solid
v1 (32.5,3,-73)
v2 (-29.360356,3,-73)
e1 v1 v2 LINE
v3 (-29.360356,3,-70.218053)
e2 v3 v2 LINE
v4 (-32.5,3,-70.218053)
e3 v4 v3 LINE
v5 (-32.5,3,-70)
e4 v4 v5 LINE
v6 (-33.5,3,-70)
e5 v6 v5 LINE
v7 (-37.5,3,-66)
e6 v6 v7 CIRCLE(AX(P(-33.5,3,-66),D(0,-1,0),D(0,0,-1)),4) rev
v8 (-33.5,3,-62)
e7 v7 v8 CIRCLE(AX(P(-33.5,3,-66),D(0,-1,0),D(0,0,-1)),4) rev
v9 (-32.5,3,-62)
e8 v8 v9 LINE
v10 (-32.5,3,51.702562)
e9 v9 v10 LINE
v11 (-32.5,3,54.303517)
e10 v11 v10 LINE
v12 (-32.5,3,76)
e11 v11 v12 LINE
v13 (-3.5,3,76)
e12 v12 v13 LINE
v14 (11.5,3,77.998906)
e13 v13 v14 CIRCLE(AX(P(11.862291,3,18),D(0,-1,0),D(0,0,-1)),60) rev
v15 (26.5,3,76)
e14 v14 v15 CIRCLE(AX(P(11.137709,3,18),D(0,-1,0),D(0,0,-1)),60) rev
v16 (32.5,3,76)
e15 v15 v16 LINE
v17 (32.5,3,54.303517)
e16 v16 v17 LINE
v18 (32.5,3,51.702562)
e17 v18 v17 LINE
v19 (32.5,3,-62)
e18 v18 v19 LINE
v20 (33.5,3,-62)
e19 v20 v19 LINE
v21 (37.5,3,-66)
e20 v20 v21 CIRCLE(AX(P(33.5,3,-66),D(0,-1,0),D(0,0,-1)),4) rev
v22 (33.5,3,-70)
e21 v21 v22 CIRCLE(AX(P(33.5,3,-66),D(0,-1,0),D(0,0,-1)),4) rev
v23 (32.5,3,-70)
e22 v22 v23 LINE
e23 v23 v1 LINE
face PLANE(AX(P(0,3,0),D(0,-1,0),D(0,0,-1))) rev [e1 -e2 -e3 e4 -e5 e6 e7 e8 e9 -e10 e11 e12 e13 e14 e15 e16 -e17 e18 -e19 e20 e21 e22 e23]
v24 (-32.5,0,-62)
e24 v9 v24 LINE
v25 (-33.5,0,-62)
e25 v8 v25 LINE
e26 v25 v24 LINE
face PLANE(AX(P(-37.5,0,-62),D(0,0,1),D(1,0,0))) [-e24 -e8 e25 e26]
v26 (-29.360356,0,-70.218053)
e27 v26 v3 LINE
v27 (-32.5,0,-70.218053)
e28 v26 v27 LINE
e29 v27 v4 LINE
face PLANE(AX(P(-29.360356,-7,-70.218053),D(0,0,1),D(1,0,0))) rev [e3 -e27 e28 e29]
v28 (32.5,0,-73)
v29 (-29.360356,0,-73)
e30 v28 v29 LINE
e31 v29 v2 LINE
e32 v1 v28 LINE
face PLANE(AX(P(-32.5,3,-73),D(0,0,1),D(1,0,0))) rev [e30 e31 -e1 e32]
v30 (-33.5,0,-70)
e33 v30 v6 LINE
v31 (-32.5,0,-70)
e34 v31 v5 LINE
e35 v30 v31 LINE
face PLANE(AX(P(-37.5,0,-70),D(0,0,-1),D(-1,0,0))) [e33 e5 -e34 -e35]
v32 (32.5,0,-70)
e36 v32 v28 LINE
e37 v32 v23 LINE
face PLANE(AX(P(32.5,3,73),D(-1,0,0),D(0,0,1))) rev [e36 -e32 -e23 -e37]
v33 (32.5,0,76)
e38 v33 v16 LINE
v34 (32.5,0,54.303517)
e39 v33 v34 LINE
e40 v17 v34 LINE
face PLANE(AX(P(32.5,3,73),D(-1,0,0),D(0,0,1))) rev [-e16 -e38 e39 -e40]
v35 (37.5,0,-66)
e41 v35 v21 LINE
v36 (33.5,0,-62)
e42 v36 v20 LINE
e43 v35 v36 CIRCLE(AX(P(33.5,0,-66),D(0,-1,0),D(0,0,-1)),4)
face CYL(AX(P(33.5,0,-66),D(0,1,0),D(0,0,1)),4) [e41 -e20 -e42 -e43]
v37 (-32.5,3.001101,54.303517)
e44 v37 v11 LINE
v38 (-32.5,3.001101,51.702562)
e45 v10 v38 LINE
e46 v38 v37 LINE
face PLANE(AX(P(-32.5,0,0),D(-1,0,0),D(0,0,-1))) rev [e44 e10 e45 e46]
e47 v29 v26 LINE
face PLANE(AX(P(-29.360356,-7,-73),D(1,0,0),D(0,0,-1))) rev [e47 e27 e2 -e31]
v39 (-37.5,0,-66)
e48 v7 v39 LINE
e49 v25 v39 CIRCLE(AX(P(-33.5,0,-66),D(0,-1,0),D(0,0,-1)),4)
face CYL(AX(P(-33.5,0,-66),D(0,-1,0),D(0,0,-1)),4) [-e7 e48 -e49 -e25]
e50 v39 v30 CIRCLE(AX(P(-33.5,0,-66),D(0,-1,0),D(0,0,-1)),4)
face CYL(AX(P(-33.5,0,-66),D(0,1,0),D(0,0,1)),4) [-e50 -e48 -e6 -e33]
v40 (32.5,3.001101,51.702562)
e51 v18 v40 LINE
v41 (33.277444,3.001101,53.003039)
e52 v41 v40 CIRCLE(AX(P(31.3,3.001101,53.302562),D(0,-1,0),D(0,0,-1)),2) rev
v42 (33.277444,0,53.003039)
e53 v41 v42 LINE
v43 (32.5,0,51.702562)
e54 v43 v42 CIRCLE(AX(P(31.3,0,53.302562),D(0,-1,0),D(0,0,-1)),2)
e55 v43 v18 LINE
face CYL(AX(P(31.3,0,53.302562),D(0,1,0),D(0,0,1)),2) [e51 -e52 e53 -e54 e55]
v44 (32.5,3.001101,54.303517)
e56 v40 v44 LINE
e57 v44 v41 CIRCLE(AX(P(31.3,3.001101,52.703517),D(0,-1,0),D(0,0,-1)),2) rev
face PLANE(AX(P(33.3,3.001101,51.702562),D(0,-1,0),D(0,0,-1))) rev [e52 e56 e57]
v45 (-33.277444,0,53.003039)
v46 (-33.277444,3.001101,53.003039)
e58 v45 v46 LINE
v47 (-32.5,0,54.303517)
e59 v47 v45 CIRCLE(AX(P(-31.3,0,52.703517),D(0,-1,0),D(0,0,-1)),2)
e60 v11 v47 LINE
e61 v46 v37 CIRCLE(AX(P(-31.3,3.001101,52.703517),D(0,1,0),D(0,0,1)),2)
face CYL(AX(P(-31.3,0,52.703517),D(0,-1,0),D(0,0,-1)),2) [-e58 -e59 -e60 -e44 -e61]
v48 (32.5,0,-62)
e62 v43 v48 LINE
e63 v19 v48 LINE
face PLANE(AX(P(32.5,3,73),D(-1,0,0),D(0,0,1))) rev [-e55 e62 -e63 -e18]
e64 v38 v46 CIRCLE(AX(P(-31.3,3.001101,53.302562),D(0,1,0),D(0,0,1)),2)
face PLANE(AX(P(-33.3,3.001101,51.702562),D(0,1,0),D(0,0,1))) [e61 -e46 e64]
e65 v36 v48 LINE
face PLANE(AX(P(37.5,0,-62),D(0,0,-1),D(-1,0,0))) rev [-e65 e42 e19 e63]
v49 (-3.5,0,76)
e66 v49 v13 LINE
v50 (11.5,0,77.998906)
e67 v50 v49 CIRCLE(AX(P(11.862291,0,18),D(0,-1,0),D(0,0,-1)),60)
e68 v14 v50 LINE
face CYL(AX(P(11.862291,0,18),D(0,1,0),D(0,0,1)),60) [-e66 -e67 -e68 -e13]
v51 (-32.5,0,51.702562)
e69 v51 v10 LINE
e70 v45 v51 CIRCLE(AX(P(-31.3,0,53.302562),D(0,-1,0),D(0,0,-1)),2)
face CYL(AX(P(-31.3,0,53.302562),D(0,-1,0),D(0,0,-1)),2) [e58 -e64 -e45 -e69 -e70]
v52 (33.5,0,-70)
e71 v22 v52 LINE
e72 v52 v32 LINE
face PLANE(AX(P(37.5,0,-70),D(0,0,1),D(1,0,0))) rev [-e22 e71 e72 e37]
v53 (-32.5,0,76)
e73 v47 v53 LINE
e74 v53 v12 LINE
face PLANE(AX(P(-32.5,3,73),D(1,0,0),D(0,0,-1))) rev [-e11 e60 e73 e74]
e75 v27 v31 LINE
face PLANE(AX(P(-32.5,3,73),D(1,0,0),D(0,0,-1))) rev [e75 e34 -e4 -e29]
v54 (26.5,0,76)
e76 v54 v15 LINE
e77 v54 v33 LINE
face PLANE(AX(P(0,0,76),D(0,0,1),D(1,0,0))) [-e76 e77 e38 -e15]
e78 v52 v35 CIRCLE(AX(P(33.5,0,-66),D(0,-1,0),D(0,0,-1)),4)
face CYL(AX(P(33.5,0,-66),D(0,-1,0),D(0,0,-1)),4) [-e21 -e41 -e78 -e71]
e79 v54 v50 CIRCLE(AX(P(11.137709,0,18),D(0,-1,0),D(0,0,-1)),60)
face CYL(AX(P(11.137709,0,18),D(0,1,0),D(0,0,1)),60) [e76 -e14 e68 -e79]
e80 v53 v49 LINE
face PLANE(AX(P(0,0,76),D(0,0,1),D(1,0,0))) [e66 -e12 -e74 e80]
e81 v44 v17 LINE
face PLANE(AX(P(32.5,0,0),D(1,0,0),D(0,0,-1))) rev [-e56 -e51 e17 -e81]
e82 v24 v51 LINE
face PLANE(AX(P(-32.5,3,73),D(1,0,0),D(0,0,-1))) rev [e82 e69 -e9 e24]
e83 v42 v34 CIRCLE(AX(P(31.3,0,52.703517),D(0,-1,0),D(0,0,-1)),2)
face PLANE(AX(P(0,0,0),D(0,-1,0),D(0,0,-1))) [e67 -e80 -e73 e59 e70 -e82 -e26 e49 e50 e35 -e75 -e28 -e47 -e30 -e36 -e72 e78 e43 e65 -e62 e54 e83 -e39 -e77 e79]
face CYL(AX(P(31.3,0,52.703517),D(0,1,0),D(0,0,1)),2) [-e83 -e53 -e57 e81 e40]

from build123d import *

# Parameters (mm, degrees)
CROQUIS1_W               = 65
CROQUIS1_H               = 146
SALIENTE_EXTRUIR1_DEPTH  = 3
CROQUIS2_W               = 8
CROQUIS2_H               = 3
SALIENTE_EXTRUIR2_DEPTH  = 5
REDONDEO1_R              = 4
REDONDEO1_OF_SIMETR_A1_R = 4
CROQUIS3_W               = 2.60095456
CROQUIS3_H               = 3.001101416
SALIENTE_EXTRUIR3_DEPTH  = 0.8
REDONDEO2_R              = 2
REDONDEO2_OF_SIMETR_A5_R = 2
CROQUIS4_W               = 65
CROQUIS4_H               = 3
CROQUIS4_W_2             = 30
CROQUIS4_H_2             = 2
SALIENTE_EXTRUIR4_DEPTH  = 3
REDONDEO3_R              = 60
CROQUIS6_W               = 3.139643751
CROQUIS6_H               = 2.781946526
CORTAR_EXTRUIR1_DEPTH    = 10


# Some blends are built 0.0001 mm under size
with BuildPart() as part:
    # Croquis1 → Saliente-Extruir1 (new body)
    with BuildSketch(Plane(origin=(0, 0, 0), x_dir=(1, 0, 0), z_dir=(0, 1, 0))):
        Rectangle(CROQUIS1_W, CROQUIS1_H)
    extrude(amount=SALIENTE_EXTRUIR1_DEPTH)

    # Croquis2 → Saliente-Extruir2 (add)
    with BuildSketch(Plane(origin=(32.5, 0, 0), x_dir=(0, 0, -1), z_dir=(1, 0, 0))):
        with Locations((66, 1.5)):
            Rectangle(CROQUIS2_W, CROQUIS2_H)
    saliente_extruir2 = extrude(amount=SALIENTE_EXTRUIR2_DEPTH)

    # Redondeo1
    redondeo1_edges = [part.edges().sort_by_distance(p)[0] for p in [
        (37.5, 1.5, -62),
        (37.5, 1.5, -70),
    ]]
    fillet(redondeo1_edges, radius=REDONDEO1_R - 0.0001)  # a hair under: the kernel refuses the full size

    # Simetría1: Saliente-Extruir2 across plane
    add(saliente_extruir2.mirror(Plane(origin=(0, 0, 0), x_dir=(0, 0, 1), z_dir=(1, 0, 0))))

    # Redondeo1 of Simetría1
    redondeo1_of_simetr_a1_edges = [part.edges().sort_by_distance(p)[0] for p in [
        (-37.5, 1.5, -62),
        (-37.5, 1.5, -70),
    ]]
    fillet(redondeo1_of_simetr_a1_edges, radius=REDONDEO1_OF_SIMETR_A1_R - 0.0001)  # a hair under: the kernel refuses the full size

    # Croquis3 → Saliente-Extruir3 (add)
    with BuildSketch(Plane(origin=(32.5, 0, 0), x_dir=(0, 0, -1), z_dir=(1, 0, 0))):
        with Locations((-53.003039433, 1.500550708)):
            Rectangle(CROQUIS3_W, CROQUIS3_H)
    saliente_extruir3 = extrude(amount=SALIENTE_EXTRUIR3_DEPTH)

    # Redondeo2
    # the kernel refuses this fillet: 2 mm, written as the material it takes off along each edge
    with BuildSketch(Plane(origin=(33.3, 7.001101416, 51.702562153), x_dir=(-1, 0, 0), z_dir=(0, -1, 0)), Plane(origin=(33.3, -4, 54.303516713), x_dir=(-1, 0, 0), z_dir=(0, 1, 0))) as redondeo2_piece_1:
        with BuildLine():
            CenterArc((2, -1.6), REDONDEO2_R, 126.869897646, 53.130102354)
            Line((0, -1.6), (-0.04, -1.6))
            Line((-0.04, -1.6), (-0.04, 0))
            Line((-0.04, 0), (0, 0.04))
            ThreePointArc((0, 0.04), (0.4, 0.04), (0.776, 0.032))
            Line((0.776, 0.032), (0.8, 0))
        make_face()
    extrude(amount=11.001101416, mode=Mode.SUBTRACT)

    # Simetría5: Saliente-Extruir3 across plane
    add(saliente_extruir3.mirror(Plane(origin=(0, 0, 0), x_dir=(0, 0, 1), z_dir=(1, 0, 0))))

    # Redondeo2 of Simetría5
    # the kernel refuses this fillet: 2 mm, written as the material it takes off along each edge
    with BuildSketch(Plane(origin=(-33.3, 7.001101416, 51.702562153), x_dir=(1, 0, 0), z_dir=(0, -1, 0)), Plane(origin=(-33.3, -4, 54.303516713), x_dir=(1, 0, 0), z_dir=(0, 1, 0))) as redondeo2_of_simetr_a5_piece_1:
        with BuildLine():
            CenterArc((2, 1.6), REDONDEO2_OF_SIMETR_A5_R, 180, 53.130102354)
            Line((0, 1.6), (-0.04, 1.6))
            Line((-0.04, 1.6), (-0.04, 0))
            Line((-0.04, 0), (0, -0.04))
            ThreePointArc((0, -0.04), (0.4, -0.04), (0.776, -0.032))
            Line((0.776, -0.032), (0.8, 0))
        make_face()
    extrude(amount=11.001101416, mode=Mode.SUBTRACT)

    # Croquis4 → Saliente-Extruir4 (add)
    with BuildSketch(Plane(origin=(0, 3, 0), x_dir=(1, 0, 0), z_dir=(0, 1, 0))):
        with Locations((0, -74.5)):
            Rectangle(CROQUIS4_W, CROQUIS4_H)
        with Locations((11.5, -77)):
            Rectangle(CROQUIS4_W_2, CROQUIS4_H_2)
    extrude(amount=-SALIENTE_EXTRUIR4_DEPTH)

    # Redondeo3
    # the kernel refuses this fillet: 60 mm, written as the material it takes off along each edge
    with BuildSketch(Plane(origin=(26.5, 41.405728739, 78), x_dir=(0, 0, -1), z_dir=(0, -1, 0))) as redondeo3_piece_1:
        with BuildLine():
            CenterArc((60, -15.362291496), REDONDEO3_R, 165.164888418, 14.835111582)
            Line((0, -15.362291496), (0, 0))
            Line((0, 0), (2, 0))
        make_face()
    extrude(amount=79.811457479, mode=Mode.SUBTRACT)
    with BuildSketch(Plane(origin=(-3.5, 41.405728739, 78), x_dir=(1, 0, 0), z_dir=(0, -1, 0))) as redondeo3_piece_2:
        with BuildLine():
            CenterArc((15.362291496, -60), REDONDEO3_R, 90, 14.835111582)
            Line((0, -2), (0, 0))
            Line((0, 0), (15.362291496, 0))
        make_face()
    extrude(amount=79.811457479, mode=Mode.SUBTRACT)

    # Croquis6 → Cortar-Extruir1 (cut)
    with BuildSketch(Plane(origin=(0, 3, 0), x_dir=(1, 0, 0), z_dir=(0, 1, 0))):
        with Locations((-30.930178125, 71.609026737)):
            Rectangle(CROQUIS6_W, CROQUIS6_H)
    extrude(amount=-CORTAR_EXTRUIR1_DEPTH, mode=Mode.SUBTRACT)


solid = part.part
